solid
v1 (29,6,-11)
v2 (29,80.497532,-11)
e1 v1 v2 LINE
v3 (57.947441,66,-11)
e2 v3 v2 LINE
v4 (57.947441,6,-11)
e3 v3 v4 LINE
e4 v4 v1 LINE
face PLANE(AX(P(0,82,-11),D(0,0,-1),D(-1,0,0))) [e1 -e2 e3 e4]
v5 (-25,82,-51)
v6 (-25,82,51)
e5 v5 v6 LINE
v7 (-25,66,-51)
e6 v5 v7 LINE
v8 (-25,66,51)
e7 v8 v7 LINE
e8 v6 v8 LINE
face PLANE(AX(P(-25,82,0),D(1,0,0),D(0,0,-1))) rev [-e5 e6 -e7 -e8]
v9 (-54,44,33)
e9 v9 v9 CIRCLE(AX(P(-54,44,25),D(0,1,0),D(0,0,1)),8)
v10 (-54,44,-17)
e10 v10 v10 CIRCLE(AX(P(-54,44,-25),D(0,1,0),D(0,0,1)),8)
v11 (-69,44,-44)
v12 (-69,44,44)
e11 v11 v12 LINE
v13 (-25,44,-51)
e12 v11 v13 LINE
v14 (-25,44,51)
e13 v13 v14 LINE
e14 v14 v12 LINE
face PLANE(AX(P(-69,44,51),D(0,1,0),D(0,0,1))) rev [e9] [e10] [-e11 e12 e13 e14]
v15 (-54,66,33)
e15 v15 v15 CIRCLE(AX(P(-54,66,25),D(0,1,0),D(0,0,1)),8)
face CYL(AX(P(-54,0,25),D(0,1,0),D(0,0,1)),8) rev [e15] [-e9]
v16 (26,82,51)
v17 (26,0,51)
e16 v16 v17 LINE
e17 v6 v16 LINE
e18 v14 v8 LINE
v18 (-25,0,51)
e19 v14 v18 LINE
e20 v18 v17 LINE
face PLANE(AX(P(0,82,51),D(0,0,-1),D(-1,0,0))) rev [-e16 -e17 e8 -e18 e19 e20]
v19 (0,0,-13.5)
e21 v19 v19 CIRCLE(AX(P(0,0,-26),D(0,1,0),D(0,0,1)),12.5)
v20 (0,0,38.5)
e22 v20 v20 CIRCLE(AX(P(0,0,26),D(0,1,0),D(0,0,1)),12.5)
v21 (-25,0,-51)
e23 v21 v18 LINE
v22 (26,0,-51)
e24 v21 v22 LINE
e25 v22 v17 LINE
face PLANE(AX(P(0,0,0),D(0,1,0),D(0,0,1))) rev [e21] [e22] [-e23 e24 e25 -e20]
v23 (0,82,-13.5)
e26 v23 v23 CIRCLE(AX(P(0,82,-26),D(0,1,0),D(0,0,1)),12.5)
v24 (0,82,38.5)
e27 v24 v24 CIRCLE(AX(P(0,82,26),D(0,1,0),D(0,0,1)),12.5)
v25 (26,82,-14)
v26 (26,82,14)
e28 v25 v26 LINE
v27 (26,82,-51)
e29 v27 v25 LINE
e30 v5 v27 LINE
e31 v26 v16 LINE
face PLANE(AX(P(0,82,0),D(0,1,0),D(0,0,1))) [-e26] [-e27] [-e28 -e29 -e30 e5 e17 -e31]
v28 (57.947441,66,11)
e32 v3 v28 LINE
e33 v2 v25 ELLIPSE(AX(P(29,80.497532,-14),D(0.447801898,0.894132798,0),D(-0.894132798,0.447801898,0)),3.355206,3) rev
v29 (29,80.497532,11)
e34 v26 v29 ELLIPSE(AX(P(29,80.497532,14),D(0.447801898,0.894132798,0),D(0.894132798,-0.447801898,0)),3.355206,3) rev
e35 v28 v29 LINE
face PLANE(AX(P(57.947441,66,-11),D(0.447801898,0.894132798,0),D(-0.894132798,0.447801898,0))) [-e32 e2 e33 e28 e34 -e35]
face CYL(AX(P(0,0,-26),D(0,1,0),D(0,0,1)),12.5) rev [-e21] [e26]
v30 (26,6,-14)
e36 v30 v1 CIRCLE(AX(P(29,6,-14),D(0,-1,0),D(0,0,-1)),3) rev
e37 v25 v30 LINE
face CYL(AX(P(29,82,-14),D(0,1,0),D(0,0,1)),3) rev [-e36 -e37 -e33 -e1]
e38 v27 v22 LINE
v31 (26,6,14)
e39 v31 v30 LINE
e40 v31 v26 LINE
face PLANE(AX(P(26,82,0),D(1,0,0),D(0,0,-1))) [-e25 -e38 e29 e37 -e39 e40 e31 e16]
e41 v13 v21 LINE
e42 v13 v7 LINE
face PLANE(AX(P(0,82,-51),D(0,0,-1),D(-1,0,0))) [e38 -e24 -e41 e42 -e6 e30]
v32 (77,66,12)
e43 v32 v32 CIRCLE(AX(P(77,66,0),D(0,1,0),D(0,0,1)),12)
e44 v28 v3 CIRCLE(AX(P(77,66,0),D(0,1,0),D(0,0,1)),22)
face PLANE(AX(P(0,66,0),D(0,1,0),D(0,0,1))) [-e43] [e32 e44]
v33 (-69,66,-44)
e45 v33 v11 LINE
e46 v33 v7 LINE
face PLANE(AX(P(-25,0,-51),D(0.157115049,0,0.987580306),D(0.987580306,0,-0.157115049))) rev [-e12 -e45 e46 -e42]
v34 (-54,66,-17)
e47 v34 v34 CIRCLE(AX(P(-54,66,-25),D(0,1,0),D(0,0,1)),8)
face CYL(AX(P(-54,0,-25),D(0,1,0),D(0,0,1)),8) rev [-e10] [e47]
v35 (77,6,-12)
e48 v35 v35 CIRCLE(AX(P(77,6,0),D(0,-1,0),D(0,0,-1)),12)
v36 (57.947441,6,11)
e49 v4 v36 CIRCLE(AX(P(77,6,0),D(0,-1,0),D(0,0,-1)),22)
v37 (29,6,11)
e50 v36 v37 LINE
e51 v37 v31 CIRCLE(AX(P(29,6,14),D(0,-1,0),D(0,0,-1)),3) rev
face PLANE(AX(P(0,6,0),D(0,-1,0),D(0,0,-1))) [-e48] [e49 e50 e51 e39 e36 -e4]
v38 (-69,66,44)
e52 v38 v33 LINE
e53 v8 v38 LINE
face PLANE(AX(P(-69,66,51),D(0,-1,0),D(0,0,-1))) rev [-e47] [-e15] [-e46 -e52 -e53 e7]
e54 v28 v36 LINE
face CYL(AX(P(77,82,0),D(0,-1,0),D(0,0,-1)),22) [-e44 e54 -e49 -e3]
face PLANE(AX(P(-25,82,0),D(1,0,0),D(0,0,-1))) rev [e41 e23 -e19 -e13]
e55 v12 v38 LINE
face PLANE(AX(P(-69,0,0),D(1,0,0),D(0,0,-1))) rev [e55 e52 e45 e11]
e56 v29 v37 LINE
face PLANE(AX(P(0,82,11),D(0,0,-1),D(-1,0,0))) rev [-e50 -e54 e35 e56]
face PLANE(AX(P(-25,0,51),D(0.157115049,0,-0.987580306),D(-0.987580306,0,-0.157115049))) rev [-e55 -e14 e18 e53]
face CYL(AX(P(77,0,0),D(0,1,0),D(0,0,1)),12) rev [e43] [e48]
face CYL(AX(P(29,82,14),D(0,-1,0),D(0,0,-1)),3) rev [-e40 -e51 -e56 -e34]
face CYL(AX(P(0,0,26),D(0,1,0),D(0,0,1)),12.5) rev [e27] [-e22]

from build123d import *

# Parameters (mm, degrees)
SCHIZZO1_R                   = 22
SCHIZZO1_W                   = 51
SCHIZZO1_H                   = 102
SCHIZZO1_W_2                 = 31.947441117
SCHIZZO1_H_2                 = 22
ESTRUSIONE_ESTRUSIONE2_DEPTH = 82
SCHIZZO2_W                   = 80.086203662
SCHIZZO2_H                   = 68.356722048
TAGLIO_ESTRUSIONE1_DEPTH     = 6
SCHIZZO3_W                   = 81.899638904
SCHIZZO3_H                   = 77.244744974
TAGLIO_ESTRUSIONE4_DEPTH     = 16
ESTRUSIONE_ESTRUSIONE3_DEPTH = 22
SCHIZZO6_W                   = 102
SCHIZZO6_H                   = 22
ESTRUSIONE_ESTRUSIONE4_DEPTH = 44
SCHIZZO7_R                   = 8
TAGLIO_ESTRUSIONE5_DEPTH     = 130.452694062
SCHIZZO8_R                   = 12.5
TAGLIO_ESTRUSIONE6_DEPTH     = 139.29678232
SCHIZZO9_R                   = 12
TAGLIO_ESTRUSIONE7_DEPTH     = 130.452694062
RACCORDO1_R                  = 3
RACCORDO2_R                  = 3


with BuildPart() as part:
    # Schizzo1 → Estrusione-Estrusione2 (new body)
    with BuildSketch(Plane(origin=(0, 0, 0), x_dir=(1, 0, 0), z_dir=(0, 1, 0))):
        with Locations((77, 0)):
            Circle(SCHIZZO1_R)
        with Locations((0.5, 0)):
            Rectangle(SCHIZZO1_W, SCHIZZO1_H)
        with Locations((41.973720559, 0)):
            Rectangle(SCHIZZO1_W_2, SCHIZZO1_H_2)
    extrude(amount=ESTRUSIONE_ESTRUSIONE2_DEPTH)

    # Schizzo2 → Taglio-Estrusione1 (cut)
    with BuildSketch(Plane.XZ):
        with Locations((66.043101831, -4.044394055)):
            Rectangle(SCHIZZO2_W, SCHIZZO2_H)
    extrude(amount=-TAGLIO_ESTRUSIONE1_DEPTH, mode=Mode.SUBTRACT)

    # Schizzo3 → Taglio-Estrusione4 (cut)
    with BuildSketch(Plane(origin=(0, 82, 0), x_dir=(1, 0, 0), z_dir=(0, 1, 0))):
        with Locations((66.949819452, -1.56539862)):
            Rectangle(SCHIZZO3_W, SCHIZZO3_H)
    extrude(amount=-TAGLIO_ESTRUSIONE4_DEPTH, mode=Mode.SUBTRACT)

    # Schizzo5 → Estrusione-Estrusione3 (add)
    with BuildSketch(Plane.XY.offset(11)):
        Polygon((57.947441117, 66), (26, 82), (26, 66), align=None)
    extrude(amount=-ESTRUSIONE_ESTRUSIONE3_DEPTH)

    # Schizzo6 → Estrusione-Estrusione4 (add)
    with BuildSketch(Plane.ZY.offset(25)):
        with Locations((0, 55)):
            Rectangle(SCHIZZO6_W, SCHIZZO6_H)
    extrude(amount=ESTRUSIONE_ESTRUSIONE4_DEPTH)

    # Schizzo7 → Taglio-Estrusione5 (cut, through all)
    with BuildSketch(Plane(origin=(0, 66, 0), x_dir=(1, 0, 0), z_dir=(0, 1, 0))):
        with Locations(Location((-54, -25, 0), (0, 0, 270))):
            Circle(SCHIZZO7_R)
        with Locations(Location((-54, 25, 0), (0, 0, 270))):
            Circle(SCHIZZO7_R)
        Polygon((-25, -51), (-69, -44), (-69, -51), align=None)
        Polygon((-25, 51), (-69, 44), (-69, 51), align=None)
    extrude(amount=-TAGLIO_ESTRUSIONE5_DEPTH, mode=Mode.SUBTRACT)

    # Schizzo8 → Taglio-Estrusione6 (cut, through all)
    with BuildSketch(Plane(origin=(0, 82, 0), x_dir=(1, 0, 0), z_dir=(0, 1, 0))):
        with Locations(Location((0, -26, 0), (0, 0, 270))):
            Circle(SCHIZZO8_R)
        with Locations(Location((0, 26, 0), (0, 0, 270))):
            Circle(SCHIZZO8_R)
    extrude(amount=-TAGLIO_ESTRUSIONE6_DEPTH, mode=Mode.SUBTRACT)

    # Schizzo9 → Taglio-Estrusione7 (cut, through all)
    with BuildSketch(Plane(origin=(0, 66, 0), x_dir=(1, 0, 0), z_dir=(0, 1, 0))):
        with Locations(Location((77, 0, 0), (0, 0, 270))):
            Circle(SCHIZZO9_R)
    extrude(amount=-TAGLIO_ESTRUSIONE7_DEPTH, mode=Mode.SUBTRACT)

    # Raccordo1
    raccordo1_edges = [part.edges().sort_by_distance(p)[0] for p in [
        (26, 44, -11),
    ]]
    fillet(raccordo1_edges, radius=RACCORDO1_R)

    # Raccordo2
    # the kernel refuses this fillet: 3 mm, written as the material it adds along each edge
    with BuildSketch(Plane(origin=(26, 82, 11), x_dir=(1, 0, 0), z_dir=(0, -1, 0))) as raccordo2_piece_1_section:
        with BuildLine():
            CenterArc((RACCORDO2_R, RACCORDO2_R), RACCORDO2_R, 180, 90)
            Line((0, RACCORDO2_R), (0, 0))
            Line((0, 0), (RACCORDO2_R, 0))
        make_face()
    raccordo2_piece_1 = extrude(amount=76, mode=Mode.PRIVATE)
    raccordo2_piece_1 = split(raccordo2_piece_1, bisect_by=Plane(origin=(41.823834569, 74.075066289, 11.680808527), z_dir=(-0.44780189792218816, -0.8941327978646608, 0)), keep=Keep.TOP, mode=Mode.PRIVATE)
    add(raccordo2_piece_1)


solid = part.part
